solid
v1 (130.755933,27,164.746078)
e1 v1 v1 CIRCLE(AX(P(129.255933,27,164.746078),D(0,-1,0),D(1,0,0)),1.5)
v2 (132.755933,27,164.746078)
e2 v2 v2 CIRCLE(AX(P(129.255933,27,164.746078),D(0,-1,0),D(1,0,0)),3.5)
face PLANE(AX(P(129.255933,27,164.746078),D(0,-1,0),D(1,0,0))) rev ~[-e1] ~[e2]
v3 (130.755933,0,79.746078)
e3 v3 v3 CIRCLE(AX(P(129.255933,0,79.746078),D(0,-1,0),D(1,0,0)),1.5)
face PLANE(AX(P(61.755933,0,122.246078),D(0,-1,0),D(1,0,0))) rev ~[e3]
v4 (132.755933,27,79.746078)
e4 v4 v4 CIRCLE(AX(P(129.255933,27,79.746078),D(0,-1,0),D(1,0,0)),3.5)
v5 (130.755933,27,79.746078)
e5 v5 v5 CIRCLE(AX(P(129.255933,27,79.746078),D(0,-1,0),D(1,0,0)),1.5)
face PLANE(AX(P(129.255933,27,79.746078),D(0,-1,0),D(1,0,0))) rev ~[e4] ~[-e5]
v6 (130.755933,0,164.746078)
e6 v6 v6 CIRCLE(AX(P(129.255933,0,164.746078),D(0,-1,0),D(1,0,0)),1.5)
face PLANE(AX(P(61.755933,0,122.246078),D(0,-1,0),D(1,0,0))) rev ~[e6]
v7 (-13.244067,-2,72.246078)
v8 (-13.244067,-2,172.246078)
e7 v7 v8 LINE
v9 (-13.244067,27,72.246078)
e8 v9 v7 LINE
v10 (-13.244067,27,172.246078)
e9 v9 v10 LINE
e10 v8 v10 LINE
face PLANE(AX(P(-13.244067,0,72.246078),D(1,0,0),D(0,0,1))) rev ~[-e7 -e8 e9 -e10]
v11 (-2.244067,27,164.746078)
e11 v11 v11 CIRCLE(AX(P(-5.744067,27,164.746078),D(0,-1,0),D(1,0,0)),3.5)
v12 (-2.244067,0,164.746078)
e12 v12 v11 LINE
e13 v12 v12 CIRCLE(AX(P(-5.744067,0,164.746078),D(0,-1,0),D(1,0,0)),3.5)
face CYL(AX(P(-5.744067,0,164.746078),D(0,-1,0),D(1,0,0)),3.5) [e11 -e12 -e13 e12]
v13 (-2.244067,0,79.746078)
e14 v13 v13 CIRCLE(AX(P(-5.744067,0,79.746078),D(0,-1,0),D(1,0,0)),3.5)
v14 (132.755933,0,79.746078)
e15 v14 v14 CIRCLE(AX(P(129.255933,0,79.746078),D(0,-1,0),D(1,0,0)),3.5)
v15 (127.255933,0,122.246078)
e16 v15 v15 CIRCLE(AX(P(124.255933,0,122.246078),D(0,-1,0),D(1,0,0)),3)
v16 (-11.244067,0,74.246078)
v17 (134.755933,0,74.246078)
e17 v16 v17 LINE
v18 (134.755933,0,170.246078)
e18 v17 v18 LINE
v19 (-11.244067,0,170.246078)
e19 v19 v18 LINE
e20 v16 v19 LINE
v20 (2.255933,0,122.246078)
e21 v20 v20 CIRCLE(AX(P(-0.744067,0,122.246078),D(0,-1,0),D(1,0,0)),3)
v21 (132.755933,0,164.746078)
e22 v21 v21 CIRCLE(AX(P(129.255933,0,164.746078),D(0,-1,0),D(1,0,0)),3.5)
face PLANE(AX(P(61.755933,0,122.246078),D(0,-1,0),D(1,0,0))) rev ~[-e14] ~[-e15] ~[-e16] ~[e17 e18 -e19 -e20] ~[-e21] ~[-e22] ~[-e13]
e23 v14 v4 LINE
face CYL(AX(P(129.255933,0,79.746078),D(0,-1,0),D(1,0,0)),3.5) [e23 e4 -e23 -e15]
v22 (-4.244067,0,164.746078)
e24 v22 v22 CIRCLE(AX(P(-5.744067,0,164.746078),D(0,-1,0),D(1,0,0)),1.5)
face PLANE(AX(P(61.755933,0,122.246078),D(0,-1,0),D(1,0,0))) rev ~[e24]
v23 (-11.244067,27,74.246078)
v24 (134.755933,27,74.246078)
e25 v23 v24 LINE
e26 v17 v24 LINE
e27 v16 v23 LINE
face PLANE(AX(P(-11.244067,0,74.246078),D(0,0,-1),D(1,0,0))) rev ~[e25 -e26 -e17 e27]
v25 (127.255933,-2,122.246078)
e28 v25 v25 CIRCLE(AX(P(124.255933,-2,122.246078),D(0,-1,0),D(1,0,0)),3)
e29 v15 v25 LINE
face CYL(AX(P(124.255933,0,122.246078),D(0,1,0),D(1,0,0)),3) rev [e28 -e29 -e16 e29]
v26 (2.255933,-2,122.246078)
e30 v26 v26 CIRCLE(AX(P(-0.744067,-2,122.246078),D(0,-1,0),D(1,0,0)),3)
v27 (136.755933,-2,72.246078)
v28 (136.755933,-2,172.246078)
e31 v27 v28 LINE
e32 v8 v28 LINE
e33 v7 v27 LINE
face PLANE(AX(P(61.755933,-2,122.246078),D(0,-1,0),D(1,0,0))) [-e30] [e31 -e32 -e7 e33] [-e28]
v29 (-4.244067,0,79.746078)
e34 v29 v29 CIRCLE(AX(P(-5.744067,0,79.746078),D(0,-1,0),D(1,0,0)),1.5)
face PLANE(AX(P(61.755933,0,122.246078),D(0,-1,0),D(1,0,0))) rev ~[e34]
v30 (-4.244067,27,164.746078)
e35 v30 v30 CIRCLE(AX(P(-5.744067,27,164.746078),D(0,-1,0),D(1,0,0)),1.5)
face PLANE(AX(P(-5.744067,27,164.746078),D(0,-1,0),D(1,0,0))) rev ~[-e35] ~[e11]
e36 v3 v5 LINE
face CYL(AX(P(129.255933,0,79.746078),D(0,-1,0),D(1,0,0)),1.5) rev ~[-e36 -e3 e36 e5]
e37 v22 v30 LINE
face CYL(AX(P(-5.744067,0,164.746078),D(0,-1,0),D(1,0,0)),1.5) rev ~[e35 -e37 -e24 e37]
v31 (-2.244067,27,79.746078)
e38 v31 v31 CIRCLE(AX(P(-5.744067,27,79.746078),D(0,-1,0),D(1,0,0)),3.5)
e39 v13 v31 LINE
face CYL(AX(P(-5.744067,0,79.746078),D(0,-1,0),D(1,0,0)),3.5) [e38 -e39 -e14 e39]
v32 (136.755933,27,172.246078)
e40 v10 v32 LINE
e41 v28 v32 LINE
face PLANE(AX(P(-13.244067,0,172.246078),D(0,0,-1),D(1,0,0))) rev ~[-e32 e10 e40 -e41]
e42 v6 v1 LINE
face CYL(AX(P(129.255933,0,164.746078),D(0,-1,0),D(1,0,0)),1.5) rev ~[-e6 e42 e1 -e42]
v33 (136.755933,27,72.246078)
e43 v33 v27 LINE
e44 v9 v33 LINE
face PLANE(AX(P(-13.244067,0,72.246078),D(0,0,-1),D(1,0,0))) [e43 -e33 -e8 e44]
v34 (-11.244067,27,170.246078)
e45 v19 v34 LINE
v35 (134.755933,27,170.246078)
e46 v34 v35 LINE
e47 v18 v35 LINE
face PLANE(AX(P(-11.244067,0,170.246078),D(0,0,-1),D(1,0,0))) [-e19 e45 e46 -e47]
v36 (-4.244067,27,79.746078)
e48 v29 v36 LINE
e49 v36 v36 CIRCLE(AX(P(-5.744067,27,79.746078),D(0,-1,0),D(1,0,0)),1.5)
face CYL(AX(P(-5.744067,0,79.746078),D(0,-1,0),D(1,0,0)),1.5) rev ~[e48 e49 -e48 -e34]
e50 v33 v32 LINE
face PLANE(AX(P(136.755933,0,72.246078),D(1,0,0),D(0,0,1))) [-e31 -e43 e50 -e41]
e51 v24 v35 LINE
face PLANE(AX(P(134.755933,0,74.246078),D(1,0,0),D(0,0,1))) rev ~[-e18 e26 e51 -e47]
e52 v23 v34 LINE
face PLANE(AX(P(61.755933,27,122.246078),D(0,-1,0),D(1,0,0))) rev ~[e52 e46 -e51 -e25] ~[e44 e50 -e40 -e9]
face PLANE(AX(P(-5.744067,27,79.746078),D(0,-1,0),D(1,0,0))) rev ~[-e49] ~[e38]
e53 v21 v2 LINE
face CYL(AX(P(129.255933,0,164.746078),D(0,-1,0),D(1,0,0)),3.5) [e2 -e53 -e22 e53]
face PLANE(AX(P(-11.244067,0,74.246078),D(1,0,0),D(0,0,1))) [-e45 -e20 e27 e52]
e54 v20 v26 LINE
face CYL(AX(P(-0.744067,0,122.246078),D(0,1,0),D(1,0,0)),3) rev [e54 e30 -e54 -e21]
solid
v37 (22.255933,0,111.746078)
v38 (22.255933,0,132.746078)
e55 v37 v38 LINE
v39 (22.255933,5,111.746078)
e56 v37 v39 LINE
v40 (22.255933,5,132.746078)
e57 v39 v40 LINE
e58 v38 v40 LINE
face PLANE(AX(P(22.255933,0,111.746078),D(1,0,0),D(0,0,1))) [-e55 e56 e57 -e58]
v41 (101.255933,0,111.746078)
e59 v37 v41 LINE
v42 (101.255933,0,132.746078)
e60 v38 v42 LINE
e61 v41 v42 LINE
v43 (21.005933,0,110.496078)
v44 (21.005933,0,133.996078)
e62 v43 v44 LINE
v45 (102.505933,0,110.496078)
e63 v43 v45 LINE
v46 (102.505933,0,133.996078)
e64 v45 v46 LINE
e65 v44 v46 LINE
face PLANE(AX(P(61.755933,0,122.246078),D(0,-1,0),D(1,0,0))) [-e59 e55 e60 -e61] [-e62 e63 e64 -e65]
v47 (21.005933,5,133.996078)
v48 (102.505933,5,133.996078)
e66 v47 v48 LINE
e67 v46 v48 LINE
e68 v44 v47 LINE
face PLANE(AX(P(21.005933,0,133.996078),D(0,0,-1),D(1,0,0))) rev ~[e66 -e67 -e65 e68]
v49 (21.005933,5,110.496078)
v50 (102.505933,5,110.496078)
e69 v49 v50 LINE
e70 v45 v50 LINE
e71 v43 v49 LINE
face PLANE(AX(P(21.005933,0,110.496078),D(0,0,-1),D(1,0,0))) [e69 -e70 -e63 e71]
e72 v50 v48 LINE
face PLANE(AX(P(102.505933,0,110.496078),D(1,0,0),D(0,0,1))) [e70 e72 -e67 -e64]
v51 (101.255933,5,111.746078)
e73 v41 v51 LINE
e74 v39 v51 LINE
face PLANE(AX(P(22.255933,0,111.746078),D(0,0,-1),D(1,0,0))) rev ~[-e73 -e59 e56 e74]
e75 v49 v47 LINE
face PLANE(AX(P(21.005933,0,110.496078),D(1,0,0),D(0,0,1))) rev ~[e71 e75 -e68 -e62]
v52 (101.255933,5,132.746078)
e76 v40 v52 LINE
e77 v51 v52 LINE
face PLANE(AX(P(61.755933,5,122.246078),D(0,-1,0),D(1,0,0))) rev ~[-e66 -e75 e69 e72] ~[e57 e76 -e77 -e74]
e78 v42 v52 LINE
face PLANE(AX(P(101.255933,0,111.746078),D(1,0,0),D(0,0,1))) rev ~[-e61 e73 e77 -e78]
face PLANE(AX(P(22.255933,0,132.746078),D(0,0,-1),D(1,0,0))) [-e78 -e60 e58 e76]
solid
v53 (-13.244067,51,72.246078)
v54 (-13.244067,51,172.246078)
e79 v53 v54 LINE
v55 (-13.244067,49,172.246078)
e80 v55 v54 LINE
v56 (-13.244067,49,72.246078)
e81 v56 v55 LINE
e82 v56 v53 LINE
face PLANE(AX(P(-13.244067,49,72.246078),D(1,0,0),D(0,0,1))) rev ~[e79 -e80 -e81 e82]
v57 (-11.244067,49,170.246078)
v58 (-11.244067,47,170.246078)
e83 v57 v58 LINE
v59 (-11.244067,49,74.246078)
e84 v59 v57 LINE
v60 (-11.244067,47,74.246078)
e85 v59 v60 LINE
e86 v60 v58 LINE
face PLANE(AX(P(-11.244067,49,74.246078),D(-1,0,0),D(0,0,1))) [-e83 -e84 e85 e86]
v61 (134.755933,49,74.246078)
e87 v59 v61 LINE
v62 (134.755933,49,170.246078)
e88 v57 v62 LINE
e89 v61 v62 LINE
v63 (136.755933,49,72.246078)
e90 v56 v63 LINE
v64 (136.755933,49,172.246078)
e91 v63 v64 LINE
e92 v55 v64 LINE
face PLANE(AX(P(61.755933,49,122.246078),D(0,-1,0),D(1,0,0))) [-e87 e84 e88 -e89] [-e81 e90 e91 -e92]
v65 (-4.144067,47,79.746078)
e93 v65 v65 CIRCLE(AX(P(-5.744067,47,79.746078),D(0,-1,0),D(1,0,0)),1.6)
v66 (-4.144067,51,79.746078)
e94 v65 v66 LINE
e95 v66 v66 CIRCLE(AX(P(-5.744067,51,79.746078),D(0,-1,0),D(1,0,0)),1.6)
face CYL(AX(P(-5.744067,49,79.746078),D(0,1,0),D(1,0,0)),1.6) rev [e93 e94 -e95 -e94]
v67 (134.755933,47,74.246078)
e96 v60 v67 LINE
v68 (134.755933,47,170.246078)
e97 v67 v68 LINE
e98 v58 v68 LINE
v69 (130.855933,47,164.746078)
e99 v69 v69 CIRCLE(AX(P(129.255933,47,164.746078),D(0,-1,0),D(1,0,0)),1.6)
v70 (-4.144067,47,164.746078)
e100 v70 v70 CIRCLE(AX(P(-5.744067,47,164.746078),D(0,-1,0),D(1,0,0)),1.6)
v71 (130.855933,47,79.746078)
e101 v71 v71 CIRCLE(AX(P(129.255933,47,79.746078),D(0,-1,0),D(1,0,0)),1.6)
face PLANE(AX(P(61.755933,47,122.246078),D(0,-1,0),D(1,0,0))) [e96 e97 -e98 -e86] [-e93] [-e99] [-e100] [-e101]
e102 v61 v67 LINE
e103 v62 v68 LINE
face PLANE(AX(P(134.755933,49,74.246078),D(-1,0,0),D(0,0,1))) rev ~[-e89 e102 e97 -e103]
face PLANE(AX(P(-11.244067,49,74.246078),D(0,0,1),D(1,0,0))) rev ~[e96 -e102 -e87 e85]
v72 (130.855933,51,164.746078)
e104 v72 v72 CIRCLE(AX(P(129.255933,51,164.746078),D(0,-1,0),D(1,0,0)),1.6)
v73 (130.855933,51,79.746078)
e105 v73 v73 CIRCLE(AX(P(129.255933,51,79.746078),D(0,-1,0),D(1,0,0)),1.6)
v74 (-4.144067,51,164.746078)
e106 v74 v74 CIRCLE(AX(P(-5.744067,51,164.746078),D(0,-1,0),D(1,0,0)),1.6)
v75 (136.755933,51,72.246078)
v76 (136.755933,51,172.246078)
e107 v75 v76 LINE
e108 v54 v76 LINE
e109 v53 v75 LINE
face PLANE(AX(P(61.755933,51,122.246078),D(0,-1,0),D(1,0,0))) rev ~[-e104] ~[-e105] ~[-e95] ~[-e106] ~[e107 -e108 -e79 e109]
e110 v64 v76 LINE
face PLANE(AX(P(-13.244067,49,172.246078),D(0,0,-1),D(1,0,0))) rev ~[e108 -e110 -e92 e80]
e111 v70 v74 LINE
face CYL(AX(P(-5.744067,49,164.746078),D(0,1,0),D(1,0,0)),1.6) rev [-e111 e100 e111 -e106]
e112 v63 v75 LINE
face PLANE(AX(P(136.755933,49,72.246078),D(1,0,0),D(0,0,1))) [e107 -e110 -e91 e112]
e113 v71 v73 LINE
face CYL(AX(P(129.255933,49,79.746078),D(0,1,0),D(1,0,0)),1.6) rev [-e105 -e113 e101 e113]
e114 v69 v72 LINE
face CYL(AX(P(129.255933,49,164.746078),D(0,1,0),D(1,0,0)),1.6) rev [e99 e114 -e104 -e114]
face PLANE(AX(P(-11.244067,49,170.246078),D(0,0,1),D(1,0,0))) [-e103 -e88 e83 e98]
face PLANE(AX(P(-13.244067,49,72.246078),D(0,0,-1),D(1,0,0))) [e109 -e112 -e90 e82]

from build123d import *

# Parameters (mm, degrees)
F0_W     = 81.5
F0_H     = 23.5
F0_W_2   = 79
F0_H_2   = 21
F1_DEPTH = 5
F0_W_3   = 150
F0_H_3   = 100
F0_W_4   = 146
F0_H_4   = 96
F0_R     = 3.5
F0_R_2   = 3
F0_R_3   = 1.5
F2_DEPTH = 2
F3_DEPTH = 27
F5_W     = 150
F5_H     = 100
F5_W_2   = 146
F5_H_2   = 96
F5_R     = 1.6
F6_DEPTH = 2
F7_DEPTH = 2


# Not quite as in the source:
# - a feature of the source that left no trace in its solid (it failed there, or was rolled back) is left out


with BuildPart() as f1:
    # F0 (on Front) → F1 (new body)
    with BuildSketch(Plane.XZ):
        with Locations((61.7559325695, 122.2460778952)):
            Rectangle(F0_W, F0_H)
        with Locations((61.7559325695, 122.2460778952)):
            Rectangle(F0_W_2, F0_H_2, mode=Mode.SUBTRACT)
    extrude(amount=-F1_DEPTH)


with BuildPart() as f2:
    # F0 (on Front) → F2 (new body)
    with BuildSketch(Plane.XZ):
        with Locations((61.7559325695, 122.2460778952)):
            Rectangle(F0_W_3, F0_H_3)
        with Locations((61.7559325695, 122.2460778952)):
            Rectangle(F0_W_4, F0_H_4, mode=Mode.SUBTRACT)
        with Locations((61.7559325695, 122.2460778952)):
            Rectangle(F0_W_4, F0_H_4)
        with Locations((-5.7440674305, 79.7460778952)):
            Circle(F0_R, mode=Mode.SUBTRACT)
        with Locations((61.7559325695, 122.2460778952)):
            Rectangle(F0_W, F0_H, mode=Mode.SUBTRACT)
        with Locations((129.2559325695, 79.7460778952)):
            Circle(F0_R, mode=Mode.SUBTRACT)
        with Locations((-0.7440674305, 122.2460778952)):
            Circle(F0_R_2, mode=Mode.SUBTRACT)
        with Locations((-5.7440674305, 164.7460778952)):
            Circle(F0_R, mode=Mode.SUBTRACT)
        with Locations((124.2559325695, 122.2460778952)):
            Circle(F0_R_2, mode=Mode.SUBTRACT)
        with Locations((129.2559325695, 164.7460778952)):
            Circle(F0_R, mode=Mode.SUBTRACT)
        with Locations((61.7559325695, 122.2460778952)):
            Rectangle(F0_W, F0_H)
        with Locations((61.7559325695, 122.2460778952)):
            Rectangle(F0_W_2, F0_H_2, mode=Mode.SUBTRACT)
        with Locations((61.7559325695, 122.2460778952)):
            Rectangle(F0_W_2, F0_H_2)
        with Locations((-5.7440674305, 79.7460778952)):
            Circle(F0_R)
        with Locations((-5.7440674305, 79.7460778952)):
            Circle(F0_R_3, mode=Mode.SUBTRACT)
        with Locations((129.2559325695, 164.7460778952)):
            Circle(F0_R)
        with Locations((129.2559325695, 164.7460778952)):
            Circle(F0_R_3, mode=Mode.SUBTRACT)
        with Locations((129.2559325695, 79.7460778952)):
            Circle(F0_R)
        with Locations((129.2559325695, 79.7460778952)):
            Circle(F0_R_3, mode=Mode.SUBTRACT)
        with Locations((-5.7440674305, 164.7460778952)):
            Circle(F0_R)
        with Locations((-5.7440674305, 164.7460778952)):
            Circle(F0_R_3, mode=Mode.SUBTRACT)
        with Locations((-5.7440674305, 79.7460778952)):
            Circle(F0_R_3)
        with Locations((129.2559325695, 164.7460778952)):
            Circle(F0_R_3)
        with Locations((129.2559325695, 79.7460778952)):
            Circle(F0_R_3)
        with Locations((-5.7440674305, 164.7460778952)):
            Circle(F0_R_3)
    extrude(amount=F2_DEPTH)

    # F0 (on Front) → F3 (join)
    with BuildSketch(Plane.XZ):
        with Locations((61.7559325695, 122.2460778952)):
            Rectangle(F0_W_3, F0_H_3)
        with Locations((61.7559325695, 122.2460778952)):
            Rectangle(F0_W_4, F0_H_4, mode=Mode.SUBTRACT)
        with Locations((129.2559325695, 164.7460778952)):
            Circle(F0_R)
        with Locations((129.2559325695, 164.7460778952)):
            Circle(F0_R_3, mode=Mode.SUBTRACT)
        with Locations((-5.7440674305, 164.7460778952)):
            Circle(F0_R)
        with Locations((-5.7440674305, 164.7460778952)):
            Circle(F0_R_3, mode=Mode.SUBTRACT)
        with Locations((-5.7440674305, 79.7460778952)):
            Circle(F0_R)
        with Locations((-5.7440674305, 79.7460778952)):
            Circle(F0_R_3, mode=Mode.SUBTRACT)
        with Locations((129.2559325695, 79.7460778952)):
            Circle(F0_R)
        with Locations((129.2559325695, 79.7460778952)):
            Circle(F0_R_3, mode=Mode.SUBTRACT)
    extrude(amount=-F3_DEPTH)


with BuildPart() as f6:
    # F5 (on offset) → F6 (new body)
    with BuildSketch(Plane.XZ.offset(-49)):
        with Locations((61.7559325695, 122.2460778952)):
            Rectangle(F5_W, F5_H)
        with Locations((61.7559325695, 122.2460778952)):
            Rectangle(F5_W_2, F5_H_2, mode=Mode.SUBTRACT)
        with Locations((61.7559325695, 122.2460778952)):
            Rectangle(F5_W_2, F5_H_2)
        with Locations((-5.7440674305, 79.7460778952)):
            Circle(F5_R, mode=Mode.SUBTRACT)
        with Locations((129.2559325695, 79.7460778952)):
            Circle(F5_R, mode=Mode.SUBTRACT)
        with Locations((-5.7440674305, 164.7460778952)):
            Circle(F5_R, mode=Mode.SUBTRACT)
        with Locations((129.2559325695, 164.7460778952)):
            Circle(F5_R, mode=Mode.SUBTRACT)
    extrude(amount=-F6_DEPTH)

    # F5 (on offset) → F7 (join)
    with BuildSketch(Plane.XZ.offset(-49)):
        with Locations((61.7559325695, 122.2460778952)):
            Rectangle(F5_W_2, F5_H_2)
        with Locations((-5.7440674305, 79.7460778952)):
            Circle(F5_R, mode=Mode.SUBTRACT)
        with Locations((129.2559325695, 79.7460778952)):
            Circle(F5_R, mode=Mode.SUBTRACT)
        with Locations((-5.7440674305, 164.7460778952)):
            Circle(F5_R, mode=Mode.SUBTRACT)
        with Locations((129.2559325695, 164.7460778952)):
            Circle(F5_R, mode=Mode.SUBTRACT)
    extrude(amount=F7_DEPTH)


solid = Compound([f1.part, f2.part, f6.part])
